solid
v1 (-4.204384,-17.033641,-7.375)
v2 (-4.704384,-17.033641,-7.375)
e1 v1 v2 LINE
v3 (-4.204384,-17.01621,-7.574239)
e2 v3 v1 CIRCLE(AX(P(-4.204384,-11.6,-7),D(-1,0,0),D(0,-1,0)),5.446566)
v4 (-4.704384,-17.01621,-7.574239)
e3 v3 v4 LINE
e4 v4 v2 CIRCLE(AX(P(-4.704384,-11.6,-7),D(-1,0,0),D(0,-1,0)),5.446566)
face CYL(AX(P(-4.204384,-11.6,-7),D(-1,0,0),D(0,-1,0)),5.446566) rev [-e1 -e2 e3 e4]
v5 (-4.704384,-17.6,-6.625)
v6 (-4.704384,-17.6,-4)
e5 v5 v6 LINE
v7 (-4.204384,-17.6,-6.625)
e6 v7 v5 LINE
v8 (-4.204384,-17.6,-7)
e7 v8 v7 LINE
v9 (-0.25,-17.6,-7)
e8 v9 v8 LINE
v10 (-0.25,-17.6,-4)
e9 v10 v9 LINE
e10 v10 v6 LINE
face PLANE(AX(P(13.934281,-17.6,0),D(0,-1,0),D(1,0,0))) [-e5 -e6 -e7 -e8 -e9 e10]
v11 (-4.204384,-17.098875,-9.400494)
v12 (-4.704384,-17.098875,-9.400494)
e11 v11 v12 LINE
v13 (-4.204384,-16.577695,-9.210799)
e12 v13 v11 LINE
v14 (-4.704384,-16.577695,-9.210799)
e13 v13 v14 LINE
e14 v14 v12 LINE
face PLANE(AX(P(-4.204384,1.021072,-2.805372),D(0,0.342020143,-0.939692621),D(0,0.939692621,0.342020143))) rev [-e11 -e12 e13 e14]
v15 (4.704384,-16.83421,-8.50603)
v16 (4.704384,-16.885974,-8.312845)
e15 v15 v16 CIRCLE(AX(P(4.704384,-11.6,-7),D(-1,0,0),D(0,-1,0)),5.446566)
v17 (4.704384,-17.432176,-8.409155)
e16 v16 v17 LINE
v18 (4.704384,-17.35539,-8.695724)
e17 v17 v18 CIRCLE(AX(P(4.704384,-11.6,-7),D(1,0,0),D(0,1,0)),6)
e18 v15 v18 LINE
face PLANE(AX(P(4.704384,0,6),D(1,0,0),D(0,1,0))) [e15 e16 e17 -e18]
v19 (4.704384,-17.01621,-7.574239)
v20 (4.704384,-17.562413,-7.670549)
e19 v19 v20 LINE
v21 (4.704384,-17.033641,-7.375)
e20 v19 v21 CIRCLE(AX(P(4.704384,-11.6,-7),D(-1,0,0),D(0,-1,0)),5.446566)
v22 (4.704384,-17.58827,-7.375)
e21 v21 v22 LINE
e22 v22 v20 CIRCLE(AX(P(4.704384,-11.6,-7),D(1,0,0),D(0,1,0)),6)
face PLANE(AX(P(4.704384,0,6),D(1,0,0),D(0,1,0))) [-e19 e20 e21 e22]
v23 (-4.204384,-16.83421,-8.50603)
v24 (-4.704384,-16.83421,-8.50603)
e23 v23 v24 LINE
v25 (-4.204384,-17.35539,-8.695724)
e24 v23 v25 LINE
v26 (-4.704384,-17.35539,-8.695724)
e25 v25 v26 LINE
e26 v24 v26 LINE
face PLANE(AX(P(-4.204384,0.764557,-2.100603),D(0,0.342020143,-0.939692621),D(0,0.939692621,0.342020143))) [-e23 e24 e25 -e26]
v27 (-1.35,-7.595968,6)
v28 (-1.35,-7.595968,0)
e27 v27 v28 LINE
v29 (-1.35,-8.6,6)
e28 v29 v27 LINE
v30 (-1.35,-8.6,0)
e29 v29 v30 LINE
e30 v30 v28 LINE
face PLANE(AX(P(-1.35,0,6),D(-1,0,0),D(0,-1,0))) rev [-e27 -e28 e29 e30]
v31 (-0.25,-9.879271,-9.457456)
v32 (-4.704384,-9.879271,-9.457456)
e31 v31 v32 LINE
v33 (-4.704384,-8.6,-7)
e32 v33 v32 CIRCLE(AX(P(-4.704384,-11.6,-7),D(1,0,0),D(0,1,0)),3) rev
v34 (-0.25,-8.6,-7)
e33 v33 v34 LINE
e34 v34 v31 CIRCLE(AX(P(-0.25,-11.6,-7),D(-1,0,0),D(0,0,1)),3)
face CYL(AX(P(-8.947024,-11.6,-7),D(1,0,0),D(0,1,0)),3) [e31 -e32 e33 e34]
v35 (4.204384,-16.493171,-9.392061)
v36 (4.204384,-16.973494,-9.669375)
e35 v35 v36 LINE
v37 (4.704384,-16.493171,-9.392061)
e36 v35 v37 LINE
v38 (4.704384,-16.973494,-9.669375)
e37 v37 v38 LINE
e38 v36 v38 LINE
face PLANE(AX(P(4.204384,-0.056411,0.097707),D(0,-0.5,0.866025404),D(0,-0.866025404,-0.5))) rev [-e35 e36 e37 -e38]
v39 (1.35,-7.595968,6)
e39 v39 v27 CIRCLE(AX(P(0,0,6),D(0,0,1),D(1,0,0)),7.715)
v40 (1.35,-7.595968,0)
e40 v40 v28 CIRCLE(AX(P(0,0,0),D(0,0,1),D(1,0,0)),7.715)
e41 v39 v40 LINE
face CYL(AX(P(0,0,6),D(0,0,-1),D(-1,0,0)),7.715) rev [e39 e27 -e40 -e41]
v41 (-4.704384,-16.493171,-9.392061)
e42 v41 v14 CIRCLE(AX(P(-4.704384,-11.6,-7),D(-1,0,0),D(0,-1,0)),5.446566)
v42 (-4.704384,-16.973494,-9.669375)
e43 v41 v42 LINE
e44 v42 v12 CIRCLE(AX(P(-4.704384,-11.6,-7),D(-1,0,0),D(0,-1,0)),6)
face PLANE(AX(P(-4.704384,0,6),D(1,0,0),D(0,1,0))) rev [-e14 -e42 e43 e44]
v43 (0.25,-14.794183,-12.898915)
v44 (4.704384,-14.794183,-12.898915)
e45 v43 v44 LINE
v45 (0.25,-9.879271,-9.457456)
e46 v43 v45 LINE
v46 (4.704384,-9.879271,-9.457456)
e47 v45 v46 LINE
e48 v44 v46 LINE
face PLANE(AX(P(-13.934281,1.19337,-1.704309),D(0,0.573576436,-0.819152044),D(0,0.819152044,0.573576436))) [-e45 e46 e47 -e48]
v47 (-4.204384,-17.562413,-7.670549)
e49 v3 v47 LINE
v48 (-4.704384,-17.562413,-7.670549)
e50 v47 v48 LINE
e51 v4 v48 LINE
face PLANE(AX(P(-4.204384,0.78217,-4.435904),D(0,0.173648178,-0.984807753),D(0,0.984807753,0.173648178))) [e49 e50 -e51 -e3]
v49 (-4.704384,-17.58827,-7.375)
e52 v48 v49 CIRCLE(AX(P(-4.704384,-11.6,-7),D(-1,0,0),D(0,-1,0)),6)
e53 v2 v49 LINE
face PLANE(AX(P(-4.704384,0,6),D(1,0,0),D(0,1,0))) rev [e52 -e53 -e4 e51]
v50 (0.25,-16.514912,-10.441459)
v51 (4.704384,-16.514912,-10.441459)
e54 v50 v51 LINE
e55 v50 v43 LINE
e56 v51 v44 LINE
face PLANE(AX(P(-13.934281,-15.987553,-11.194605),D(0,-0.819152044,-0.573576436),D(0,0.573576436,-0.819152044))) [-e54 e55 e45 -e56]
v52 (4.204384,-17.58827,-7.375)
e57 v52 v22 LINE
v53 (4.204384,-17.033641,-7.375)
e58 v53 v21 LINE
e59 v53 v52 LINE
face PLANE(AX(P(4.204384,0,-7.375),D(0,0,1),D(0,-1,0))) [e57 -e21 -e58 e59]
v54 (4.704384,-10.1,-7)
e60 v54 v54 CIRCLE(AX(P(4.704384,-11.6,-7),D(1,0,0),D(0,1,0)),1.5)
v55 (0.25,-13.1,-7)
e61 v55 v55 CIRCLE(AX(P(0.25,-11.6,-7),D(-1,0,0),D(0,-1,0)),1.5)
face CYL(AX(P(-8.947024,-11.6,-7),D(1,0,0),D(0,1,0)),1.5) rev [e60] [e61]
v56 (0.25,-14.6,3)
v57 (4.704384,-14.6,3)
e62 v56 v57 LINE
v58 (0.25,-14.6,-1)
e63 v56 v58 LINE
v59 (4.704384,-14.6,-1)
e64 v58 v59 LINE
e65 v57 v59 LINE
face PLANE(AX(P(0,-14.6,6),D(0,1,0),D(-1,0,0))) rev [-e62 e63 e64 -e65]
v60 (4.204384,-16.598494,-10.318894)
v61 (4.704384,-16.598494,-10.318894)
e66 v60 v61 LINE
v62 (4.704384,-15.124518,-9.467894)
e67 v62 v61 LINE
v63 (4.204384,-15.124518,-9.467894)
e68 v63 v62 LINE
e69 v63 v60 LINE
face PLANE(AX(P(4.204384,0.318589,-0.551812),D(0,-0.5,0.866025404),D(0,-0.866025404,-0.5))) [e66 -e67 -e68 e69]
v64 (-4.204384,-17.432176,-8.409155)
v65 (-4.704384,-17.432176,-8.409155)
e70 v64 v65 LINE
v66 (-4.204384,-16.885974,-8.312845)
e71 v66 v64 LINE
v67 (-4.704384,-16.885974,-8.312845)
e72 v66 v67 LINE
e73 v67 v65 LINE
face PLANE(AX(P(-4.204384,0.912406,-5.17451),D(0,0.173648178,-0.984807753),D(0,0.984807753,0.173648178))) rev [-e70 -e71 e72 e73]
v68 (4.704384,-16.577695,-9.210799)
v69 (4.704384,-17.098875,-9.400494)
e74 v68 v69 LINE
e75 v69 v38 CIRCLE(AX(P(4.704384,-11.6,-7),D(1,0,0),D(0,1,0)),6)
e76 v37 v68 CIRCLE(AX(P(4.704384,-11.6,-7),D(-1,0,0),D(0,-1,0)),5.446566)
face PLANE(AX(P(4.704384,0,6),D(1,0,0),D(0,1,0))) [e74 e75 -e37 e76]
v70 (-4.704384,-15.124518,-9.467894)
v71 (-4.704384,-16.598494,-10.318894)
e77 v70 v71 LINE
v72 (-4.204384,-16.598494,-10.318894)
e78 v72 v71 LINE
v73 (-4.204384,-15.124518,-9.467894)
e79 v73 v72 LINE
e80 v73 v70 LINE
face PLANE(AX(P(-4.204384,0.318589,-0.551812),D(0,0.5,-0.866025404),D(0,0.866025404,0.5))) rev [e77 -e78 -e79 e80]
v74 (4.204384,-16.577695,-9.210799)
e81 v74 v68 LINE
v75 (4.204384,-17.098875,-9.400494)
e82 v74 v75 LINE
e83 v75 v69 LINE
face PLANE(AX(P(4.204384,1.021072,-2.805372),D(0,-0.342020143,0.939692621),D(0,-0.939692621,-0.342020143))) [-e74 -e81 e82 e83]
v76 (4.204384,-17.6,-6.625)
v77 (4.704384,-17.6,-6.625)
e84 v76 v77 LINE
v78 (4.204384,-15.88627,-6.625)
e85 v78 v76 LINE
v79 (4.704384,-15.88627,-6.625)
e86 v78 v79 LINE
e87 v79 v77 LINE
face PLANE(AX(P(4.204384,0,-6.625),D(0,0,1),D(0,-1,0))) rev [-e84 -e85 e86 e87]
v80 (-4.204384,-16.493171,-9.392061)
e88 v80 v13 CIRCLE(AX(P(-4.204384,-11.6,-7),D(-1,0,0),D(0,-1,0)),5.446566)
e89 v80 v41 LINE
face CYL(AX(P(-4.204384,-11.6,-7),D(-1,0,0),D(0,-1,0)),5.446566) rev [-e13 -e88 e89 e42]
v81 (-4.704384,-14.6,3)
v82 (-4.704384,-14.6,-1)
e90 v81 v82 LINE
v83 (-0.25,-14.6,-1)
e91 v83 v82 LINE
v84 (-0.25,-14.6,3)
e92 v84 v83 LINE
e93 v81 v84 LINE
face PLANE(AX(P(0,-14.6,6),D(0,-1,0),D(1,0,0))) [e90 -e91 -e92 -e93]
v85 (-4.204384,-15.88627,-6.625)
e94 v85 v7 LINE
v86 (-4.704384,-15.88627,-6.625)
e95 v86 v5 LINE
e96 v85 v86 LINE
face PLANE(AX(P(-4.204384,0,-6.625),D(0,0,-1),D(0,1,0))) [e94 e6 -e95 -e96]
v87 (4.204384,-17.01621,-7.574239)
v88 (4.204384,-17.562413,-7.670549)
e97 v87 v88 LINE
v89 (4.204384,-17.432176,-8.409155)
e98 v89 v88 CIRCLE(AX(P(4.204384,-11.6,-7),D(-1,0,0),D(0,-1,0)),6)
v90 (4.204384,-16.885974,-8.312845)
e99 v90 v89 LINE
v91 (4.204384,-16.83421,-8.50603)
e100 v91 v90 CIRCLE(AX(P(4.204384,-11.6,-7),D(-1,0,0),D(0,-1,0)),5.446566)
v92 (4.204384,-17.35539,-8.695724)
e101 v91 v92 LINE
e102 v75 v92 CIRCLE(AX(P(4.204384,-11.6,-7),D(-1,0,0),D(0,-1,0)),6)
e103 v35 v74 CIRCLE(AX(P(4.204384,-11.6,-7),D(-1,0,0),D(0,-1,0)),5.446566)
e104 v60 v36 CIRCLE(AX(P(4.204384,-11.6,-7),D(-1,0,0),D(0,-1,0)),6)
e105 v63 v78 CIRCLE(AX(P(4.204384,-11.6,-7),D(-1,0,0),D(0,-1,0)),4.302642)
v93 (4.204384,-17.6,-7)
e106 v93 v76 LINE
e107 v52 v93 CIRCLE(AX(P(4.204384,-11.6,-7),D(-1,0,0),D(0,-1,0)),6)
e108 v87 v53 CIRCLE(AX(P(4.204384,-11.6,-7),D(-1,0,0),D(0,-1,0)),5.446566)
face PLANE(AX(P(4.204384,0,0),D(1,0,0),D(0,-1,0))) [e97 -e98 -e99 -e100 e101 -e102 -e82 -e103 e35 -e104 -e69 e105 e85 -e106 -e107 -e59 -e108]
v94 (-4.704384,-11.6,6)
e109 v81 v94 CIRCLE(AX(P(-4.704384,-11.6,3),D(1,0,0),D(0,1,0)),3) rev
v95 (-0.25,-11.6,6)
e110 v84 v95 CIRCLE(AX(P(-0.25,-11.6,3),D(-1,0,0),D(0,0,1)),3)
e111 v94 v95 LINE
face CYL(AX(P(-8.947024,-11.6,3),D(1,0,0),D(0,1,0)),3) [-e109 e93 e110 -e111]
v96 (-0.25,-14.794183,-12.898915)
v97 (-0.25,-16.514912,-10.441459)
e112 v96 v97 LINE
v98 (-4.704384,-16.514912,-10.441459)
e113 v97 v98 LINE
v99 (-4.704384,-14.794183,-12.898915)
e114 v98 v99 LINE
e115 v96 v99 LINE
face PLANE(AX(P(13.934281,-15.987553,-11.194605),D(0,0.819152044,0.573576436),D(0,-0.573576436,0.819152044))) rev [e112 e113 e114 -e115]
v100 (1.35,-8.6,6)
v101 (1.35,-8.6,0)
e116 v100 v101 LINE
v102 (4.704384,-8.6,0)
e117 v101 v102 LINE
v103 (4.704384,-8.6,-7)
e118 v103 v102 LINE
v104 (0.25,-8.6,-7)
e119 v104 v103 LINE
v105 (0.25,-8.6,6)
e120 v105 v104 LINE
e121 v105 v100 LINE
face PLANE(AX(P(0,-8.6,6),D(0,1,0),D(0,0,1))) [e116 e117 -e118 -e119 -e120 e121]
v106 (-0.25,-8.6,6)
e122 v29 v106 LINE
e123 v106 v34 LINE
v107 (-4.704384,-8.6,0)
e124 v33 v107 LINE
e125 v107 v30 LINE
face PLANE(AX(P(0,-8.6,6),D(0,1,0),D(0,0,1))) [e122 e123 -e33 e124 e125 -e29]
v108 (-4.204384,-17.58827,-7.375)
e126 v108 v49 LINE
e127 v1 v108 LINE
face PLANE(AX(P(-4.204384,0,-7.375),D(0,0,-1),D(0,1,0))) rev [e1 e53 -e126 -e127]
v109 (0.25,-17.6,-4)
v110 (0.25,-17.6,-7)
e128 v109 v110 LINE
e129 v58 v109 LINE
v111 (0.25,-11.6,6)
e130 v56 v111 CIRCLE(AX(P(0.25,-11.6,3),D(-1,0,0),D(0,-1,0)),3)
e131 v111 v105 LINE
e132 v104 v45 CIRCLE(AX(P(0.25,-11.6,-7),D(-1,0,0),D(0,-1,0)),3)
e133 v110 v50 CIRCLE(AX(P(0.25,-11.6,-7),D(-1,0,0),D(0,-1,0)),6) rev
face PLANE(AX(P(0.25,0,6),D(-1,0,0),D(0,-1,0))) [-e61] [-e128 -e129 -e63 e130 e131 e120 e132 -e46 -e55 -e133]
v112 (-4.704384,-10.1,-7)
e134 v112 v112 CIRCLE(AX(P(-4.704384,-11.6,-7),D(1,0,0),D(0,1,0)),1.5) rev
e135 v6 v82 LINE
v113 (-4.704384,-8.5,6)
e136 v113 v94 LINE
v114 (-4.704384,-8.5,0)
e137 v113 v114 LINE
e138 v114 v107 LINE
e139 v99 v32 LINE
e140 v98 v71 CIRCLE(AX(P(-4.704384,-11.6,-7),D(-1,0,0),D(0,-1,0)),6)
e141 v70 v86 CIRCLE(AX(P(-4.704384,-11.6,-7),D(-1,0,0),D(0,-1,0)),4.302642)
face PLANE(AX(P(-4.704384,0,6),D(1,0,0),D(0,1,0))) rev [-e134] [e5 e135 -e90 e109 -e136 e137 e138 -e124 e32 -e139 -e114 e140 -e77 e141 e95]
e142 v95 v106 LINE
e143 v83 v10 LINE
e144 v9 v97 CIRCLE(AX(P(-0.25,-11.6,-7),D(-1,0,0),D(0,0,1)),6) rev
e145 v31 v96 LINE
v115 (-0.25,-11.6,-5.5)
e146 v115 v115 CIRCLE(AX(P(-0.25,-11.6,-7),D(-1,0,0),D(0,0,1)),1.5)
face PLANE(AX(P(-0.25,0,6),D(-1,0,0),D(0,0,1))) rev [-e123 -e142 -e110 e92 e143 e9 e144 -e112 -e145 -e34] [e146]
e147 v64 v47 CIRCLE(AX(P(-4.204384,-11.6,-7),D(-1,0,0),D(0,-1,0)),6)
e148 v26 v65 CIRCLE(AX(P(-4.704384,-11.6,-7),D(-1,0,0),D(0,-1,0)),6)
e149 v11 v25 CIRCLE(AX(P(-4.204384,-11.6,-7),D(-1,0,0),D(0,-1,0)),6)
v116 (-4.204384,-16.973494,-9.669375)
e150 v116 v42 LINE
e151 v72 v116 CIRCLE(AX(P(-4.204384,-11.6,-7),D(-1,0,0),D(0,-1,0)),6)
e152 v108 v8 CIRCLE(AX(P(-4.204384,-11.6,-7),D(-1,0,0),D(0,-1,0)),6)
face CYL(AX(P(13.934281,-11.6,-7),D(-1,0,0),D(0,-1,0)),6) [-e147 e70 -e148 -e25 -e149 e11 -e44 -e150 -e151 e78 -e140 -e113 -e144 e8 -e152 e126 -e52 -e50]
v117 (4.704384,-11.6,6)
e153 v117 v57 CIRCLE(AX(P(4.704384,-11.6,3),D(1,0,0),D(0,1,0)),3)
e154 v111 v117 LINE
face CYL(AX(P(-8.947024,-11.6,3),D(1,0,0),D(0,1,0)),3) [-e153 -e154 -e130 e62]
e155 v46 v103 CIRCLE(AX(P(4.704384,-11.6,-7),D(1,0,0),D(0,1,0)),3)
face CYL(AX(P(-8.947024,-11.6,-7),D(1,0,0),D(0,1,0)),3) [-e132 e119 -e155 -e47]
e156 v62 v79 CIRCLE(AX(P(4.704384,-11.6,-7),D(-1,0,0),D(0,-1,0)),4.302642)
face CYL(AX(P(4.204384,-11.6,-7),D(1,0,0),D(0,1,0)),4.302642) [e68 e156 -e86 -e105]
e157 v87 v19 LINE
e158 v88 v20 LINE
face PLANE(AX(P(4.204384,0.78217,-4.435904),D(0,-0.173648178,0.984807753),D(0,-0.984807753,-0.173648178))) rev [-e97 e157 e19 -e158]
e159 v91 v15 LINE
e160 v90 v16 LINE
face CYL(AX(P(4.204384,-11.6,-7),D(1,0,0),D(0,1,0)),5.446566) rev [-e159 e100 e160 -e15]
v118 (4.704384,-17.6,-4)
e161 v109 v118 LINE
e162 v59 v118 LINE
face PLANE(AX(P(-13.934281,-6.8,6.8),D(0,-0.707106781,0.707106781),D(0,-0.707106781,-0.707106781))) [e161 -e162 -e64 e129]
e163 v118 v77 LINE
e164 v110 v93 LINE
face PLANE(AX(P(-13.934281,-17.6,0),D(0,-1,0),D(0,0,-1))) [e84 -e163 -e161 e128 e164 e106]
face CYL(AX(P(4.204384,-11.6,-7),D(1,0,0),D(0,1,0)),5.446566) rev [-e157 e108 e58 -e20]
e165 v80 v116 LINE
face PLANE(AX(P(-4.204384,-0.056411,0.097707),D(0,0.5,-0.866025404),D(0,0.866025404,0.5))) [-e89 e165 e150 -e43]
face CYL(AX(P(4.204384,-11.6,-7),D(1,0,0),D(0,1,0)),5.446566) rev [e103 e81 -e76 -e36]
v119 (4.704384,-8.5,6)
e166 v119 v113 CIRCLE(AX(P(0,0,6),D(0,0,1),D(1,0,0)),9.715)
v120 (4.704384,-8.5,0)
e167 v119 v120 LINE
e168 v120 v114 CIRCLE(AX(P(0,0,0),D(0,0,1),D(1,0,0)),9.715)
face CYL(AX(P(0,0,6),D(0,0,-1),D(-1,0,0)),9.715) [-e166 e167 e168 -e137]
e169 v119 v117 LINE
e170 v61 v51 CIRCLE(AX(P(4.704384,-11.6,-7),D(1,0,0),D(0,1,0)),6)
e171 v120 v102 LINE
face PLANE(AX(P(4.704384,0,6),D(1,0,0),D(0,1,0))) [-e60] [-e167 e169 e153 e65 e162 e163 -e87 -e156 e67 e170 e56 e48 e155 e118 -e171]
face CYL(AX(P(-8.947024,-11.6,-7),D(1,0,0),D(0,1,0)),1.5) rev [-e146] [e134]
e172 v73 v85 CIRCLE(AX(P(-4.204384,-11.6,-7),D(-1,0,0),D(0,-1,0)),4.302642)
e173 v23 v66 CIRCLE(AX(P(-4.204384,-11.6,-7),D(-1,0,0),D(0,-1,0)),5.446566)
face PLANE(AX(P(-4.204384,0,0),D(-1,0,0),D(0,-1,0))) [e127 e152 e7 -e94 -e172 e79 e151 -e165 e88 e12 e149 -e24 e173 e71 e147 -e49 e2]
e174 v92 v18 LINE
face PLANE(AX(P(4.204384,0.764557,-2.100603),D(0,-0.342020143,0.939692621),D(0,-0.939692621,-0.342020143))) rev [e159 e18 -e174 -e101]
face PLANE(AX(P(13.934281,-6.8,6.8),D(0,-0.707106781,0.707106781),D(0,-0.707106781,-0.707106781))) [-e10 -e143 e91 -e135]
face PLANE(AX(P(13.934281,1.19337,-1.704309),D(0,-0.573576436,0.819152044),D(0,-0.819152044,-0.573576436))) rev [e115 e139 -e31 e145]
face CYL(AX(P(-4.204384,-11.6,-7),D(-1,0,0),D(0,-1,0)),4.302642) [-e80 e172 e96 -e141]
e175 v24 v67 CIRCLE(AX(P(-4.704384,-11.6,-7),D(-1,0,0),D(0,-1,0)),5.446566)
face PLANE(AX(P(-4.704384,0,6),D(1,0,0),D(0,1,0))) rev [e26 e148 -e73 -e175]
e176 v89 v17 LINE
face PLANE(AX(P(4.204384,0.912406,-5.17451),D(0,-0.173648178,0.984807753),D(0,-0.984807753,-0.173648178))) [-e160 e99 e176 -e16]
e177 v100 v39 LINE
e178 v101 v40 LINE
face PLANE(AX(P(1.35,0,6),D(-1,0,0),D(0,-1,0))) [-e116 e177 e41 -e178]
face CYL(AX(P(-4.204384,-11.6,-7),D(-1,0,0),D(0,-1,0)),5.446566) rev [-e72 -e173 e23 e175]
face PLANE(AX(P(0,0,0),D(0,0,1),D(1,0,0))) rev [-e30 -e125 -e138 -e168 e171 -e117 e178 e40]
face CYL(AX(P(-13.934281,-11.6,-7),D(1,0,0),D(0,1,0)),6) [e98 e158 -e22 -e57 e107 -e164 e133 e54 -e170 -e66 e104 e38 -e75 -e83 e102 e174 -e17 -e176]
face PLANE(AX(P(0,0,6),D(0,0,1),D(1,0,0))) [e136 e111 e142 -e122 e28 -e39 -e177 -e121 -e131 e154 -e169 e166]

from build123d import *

# Parameters (mm, degrees)
SHAPE_DEPTH       = 6
SKETCH3_W         = 4.454383594
SKETCH3_H         = 6
LEVER_DEPTH       = 10
CUTS_START        = -9.408767
SKETCH2_R         = 1.5
CUTS_DEPTH        = 9.408767
LIMITS_1_DEPTH    = 4.454383594
LIMITS_START      = -4.454383594
LIMITS_2_DEPTH    = 4.454383594
ANGLE_FIX_1_DEPTH = 0.5


with BuildPart() as part:
    # Sketch1 → Shape (new body)
    with BuildSketch(Plane.XY):
        with BuildLine():
            Line((1.35, -7.59596768), (1.35, -8.6))
            Line((1.35, -8.6), (0.25, -8.6))
            Line((0.25, -8.6), (0.25, -14.6))
            Line((0.25, -14.6), (4.704383594, -14.6))
            Line((4.704383594, -14.6), (4.704383594, -8.5))
            ThreePointArc((4.704383594, -8.5), (0, 9.715), (-4.704383594, -8.5))
            Line((-4.704383594, -8.5), (-4.704383594, -14.6))
            Line((-4.704383594, -14.6), (-0.25, -14.6))
            Line((-0.25, -14.6), (-0.25, -8.6))
            Line((-0.25, -8.6), (-1.35, -8.6))
            Line((-1.35, -8.6), (-1.35, -7.59596768))
            ThreePointArc((-1.35, -7.59596768), (0, 7.715), (1.35, -7.59596768))
        make_face()
    extrude(amount=SHAPE_DEPTH)

    # Sketch3 → Lever (add)
    with BuildSketch(Plane(origin=(0, 0, 0), x_dir=(-1, 0, 0), z_dir=(0, 0, -1))):
        with Locations((-2.477191797, -11.6)):
            Rectangle(SKETCH3_W, SKETCH3_H)
        with Locations((2.477191797, -11.6)):
            Rectangle(SKETCH3_W, SKETCH3_H)
    extrude(amount=LEVER_DEPTH)

    # Sketch2 → Cuts (cut)
    with BuildSketch(Plane(origin=(4.704383594, 0, 0), x_dir=(0, 0, -1), z_dir=(1, 0, 0)).offset(CUTS_START)):
        with BuildLine():
            ThreePointArc((-3, -14.6), (-5.121320344, -13.721320344), (-6, -11.6))
            Line((-6, -11.6), (-6, -14.6))
            Line((-6, -14.6), (-3, -14.6))
        make_face()
        with BuildLine():
            Line((10, -8.6), (7, -8.6))
            ThreePointArc((7, -8.6), (9.121320344, -9.478679656), (10, -11.6))
            Line((10, -11.6), (10, -8.6))
        make_face()
        with BuildLine():
            ThreePointArc((10, -11.6), (9.121320344, -13.721320344), (7, -14.6))
            Line((7, -14.6), (10, -14.6))
            Line((10, -14.6), (10, -11.6))
        make_face()
        with Locations(Location((7, -11.6, 0), (0, 0, 90))):
            Circle(SKETCH2_R)
    extrude(amount=CUTS_DEPTH, mode=Mode.SUBTRACT)

    # Sketch5 → Limits 1 (add)
    with BuildSketch(Plane.ZY.offset(4.704383594)):
        with BuildLine():
            ThreePointArc((-4, -16.796152423), (-5.447085729, -17.395554958), (-7, -17.6))
            Line((-7, -17.6), (-4, -17.6))
            Line((-4, -17.6), (-4, -16.796152423))
        make_face()
        with BuildLine():
            Line((-7, -14.6), (-7, -17.6))
            ThreePointArc((-7, -17.6), (-5.447085729, -17.395554958), (-4, -16.796152423))
            Line((-4, -16.796152423), (-4, -14.6))
            Line((-4, -14.6), (-7, -14.6))
        make_face()
        with BuildLine():
            ThreePointArc((-12.437846722, -14.13570957), (-11.596266659, -15.456725658), (-10.441458618, -16.514912266))
            Line((-10.441458618, -16.514912266), (-8.720729309, -14.057456133))
            ThreePointArc((-8.720729309, -14.057456133), (-9.954423259, -12.120944533), (-9.457456133, -9.879270691))
            Line((-9.457456133, -9.879270691), (-12.437846722, -14.13570957))
        make_face()
        with BuildLine():
            Line((-12.898914751, -14.794182957), (-10.441458618, -16.514912266))
            ThreePointArc((-10.441458618, -16.514912266), (-11.596266659, -15.456725658), (-12.437846722, -14.13570957))
            Line((-12.437846722, -14.13570957), (-12.898914751, -14.794182957))
        make_face()
        with BuildLine():
            ThreePointArc((-10.441458618, -16.514912266), (-8.804234797, -17.322301704), (-7, -17.6))
            Line((-7, -17.6), (-7, -14.6))
            ThreePointArc((-7, -14.6), (-7.902117399, -14.461150852), (-8.720729309, -14.057456133))
            Line((-8.720729309, -14.057456133), (-10.441458618, -16.514912266))
        make_face()
        with BuildLine():
            Line((-4, -16.796152423), (-4, -17.6))
            Line((-4, -17.6), (-1, -14.6))
            Line((-1, -14.6), (-1.803847577, -14.6))
            ThreePointArc((-1.803847577, -14.6), (-2.757359313, -15.842640687), (-4, -16.796152423))
        make_face()
        with BuildLine():
            Line((-4, -14.6), (-4, -16.796152423))
            ThreePointArc((-4, -16.796152423), (-2.757359313, -15.842640687), (-1.803847577, -14.6))
            Line((-1.803847577, -14.6), (-4, -14.6))
        make_face()
    extrude(amount=-LIMITS_1_DEPTH)

    # Sketch6 → Limits 2 (add)
    with BuildSketch(Plane(origin=(4.704383594, 0, 0), x_dir=(0, 0, -1), z_dir=(1, 0, 0)).offset(LIMITS_START)):
        with BuildLine():
            Line((7, -14.6), (1, -14.6))
            Line((1, -14.6), (4, -17.6))
            Line((4, -17.6), (7, -17.6))
            ThreePointArc((7, -17.6), (8.804234797, -17.322301704), (10.441458618, -16.514912266))
            Line((10.441458618, -16.514912266), (12.898914751, -14.794182957))
            Line((12.898914751, -14.794182957), (9.457456133, -9.879270691))
            ThreePointArc((9.457456133, -9.879270691), (9.6610325, -12.98524584), (7, -14.6))
        make_face()
    extrude(amount=LIMITS_2_DEPTH)

    # Sketch7 → Angle fix 1 (cut)
    with BuildSketch(Plane.ZY.offset(4.704383594)):
        with BuildLine():
            Line((-8.312844754, -16.885973656), (-8.411191973, -17.443728451))
            Line((-8.411191973, -17.443728451), (-7.672586159, -17.573964585))
            Line((-7.672586159, -17.573964585), (-7.57423894, -17.01620979))
            ThreePointArc((-7.57423894, -17.01620979), (-7.474699486, -17.025839957), (-7.375, -17.033640938))
            Line((-7.375, -17.033640938), (-7.375, -17.6))
            Line((-7.375, -17.6), (-6.625, -17.6))
            Line((-6.625, -17.6), (-6.625, -15.886269614))
            ThreePointArc((-6.625, -15.886269614), (-8.113605815, -15.75603348), (-9.467894333, -15.124518373))
            Line((-9.467894333, -15.124518373), (-10.324759526, -16.608652423))
            Line((-10.324759526, -16.608652423), (-9.675240474, -16.983652423))
            Line((-9.675240474, -16.983652423), (-9.392060943, -16.493171087))
            ThreePointArc((-9.392060943, -16.493171087), (-9.301818164, -16.536264983), (-9.210799385, -16.57769474))
            Line((-9.210799385, -16.57769474), (-9.404505593, -17.109898171))
            Line((-9.404505593, -17.109898171), (-8.699736127, -17.366413278))
            Line((-8.699736127, -17.366413278), (-8.50602992, -16.834209847))
            ThreePointArc((-8.50602992, -16.834209847), (-8.409674955, -16.860978556), (-8.312844754, -16.885973656))
        make_face()
    angle_fix_1 = extrude(amount=-ANGLE_FIX_1_DEPTH, mode=Mode.SUBTRACT)

    # Angle fix 2: Angle fix 1 across plane
    add(angle_fix_1.mirror(Plane(origin=(0, 0, 0), x_dir=(0, 0, 1), z_dir=(1, 0, 0))), mode=Mode.SUBTRACT)


solid = part.part
